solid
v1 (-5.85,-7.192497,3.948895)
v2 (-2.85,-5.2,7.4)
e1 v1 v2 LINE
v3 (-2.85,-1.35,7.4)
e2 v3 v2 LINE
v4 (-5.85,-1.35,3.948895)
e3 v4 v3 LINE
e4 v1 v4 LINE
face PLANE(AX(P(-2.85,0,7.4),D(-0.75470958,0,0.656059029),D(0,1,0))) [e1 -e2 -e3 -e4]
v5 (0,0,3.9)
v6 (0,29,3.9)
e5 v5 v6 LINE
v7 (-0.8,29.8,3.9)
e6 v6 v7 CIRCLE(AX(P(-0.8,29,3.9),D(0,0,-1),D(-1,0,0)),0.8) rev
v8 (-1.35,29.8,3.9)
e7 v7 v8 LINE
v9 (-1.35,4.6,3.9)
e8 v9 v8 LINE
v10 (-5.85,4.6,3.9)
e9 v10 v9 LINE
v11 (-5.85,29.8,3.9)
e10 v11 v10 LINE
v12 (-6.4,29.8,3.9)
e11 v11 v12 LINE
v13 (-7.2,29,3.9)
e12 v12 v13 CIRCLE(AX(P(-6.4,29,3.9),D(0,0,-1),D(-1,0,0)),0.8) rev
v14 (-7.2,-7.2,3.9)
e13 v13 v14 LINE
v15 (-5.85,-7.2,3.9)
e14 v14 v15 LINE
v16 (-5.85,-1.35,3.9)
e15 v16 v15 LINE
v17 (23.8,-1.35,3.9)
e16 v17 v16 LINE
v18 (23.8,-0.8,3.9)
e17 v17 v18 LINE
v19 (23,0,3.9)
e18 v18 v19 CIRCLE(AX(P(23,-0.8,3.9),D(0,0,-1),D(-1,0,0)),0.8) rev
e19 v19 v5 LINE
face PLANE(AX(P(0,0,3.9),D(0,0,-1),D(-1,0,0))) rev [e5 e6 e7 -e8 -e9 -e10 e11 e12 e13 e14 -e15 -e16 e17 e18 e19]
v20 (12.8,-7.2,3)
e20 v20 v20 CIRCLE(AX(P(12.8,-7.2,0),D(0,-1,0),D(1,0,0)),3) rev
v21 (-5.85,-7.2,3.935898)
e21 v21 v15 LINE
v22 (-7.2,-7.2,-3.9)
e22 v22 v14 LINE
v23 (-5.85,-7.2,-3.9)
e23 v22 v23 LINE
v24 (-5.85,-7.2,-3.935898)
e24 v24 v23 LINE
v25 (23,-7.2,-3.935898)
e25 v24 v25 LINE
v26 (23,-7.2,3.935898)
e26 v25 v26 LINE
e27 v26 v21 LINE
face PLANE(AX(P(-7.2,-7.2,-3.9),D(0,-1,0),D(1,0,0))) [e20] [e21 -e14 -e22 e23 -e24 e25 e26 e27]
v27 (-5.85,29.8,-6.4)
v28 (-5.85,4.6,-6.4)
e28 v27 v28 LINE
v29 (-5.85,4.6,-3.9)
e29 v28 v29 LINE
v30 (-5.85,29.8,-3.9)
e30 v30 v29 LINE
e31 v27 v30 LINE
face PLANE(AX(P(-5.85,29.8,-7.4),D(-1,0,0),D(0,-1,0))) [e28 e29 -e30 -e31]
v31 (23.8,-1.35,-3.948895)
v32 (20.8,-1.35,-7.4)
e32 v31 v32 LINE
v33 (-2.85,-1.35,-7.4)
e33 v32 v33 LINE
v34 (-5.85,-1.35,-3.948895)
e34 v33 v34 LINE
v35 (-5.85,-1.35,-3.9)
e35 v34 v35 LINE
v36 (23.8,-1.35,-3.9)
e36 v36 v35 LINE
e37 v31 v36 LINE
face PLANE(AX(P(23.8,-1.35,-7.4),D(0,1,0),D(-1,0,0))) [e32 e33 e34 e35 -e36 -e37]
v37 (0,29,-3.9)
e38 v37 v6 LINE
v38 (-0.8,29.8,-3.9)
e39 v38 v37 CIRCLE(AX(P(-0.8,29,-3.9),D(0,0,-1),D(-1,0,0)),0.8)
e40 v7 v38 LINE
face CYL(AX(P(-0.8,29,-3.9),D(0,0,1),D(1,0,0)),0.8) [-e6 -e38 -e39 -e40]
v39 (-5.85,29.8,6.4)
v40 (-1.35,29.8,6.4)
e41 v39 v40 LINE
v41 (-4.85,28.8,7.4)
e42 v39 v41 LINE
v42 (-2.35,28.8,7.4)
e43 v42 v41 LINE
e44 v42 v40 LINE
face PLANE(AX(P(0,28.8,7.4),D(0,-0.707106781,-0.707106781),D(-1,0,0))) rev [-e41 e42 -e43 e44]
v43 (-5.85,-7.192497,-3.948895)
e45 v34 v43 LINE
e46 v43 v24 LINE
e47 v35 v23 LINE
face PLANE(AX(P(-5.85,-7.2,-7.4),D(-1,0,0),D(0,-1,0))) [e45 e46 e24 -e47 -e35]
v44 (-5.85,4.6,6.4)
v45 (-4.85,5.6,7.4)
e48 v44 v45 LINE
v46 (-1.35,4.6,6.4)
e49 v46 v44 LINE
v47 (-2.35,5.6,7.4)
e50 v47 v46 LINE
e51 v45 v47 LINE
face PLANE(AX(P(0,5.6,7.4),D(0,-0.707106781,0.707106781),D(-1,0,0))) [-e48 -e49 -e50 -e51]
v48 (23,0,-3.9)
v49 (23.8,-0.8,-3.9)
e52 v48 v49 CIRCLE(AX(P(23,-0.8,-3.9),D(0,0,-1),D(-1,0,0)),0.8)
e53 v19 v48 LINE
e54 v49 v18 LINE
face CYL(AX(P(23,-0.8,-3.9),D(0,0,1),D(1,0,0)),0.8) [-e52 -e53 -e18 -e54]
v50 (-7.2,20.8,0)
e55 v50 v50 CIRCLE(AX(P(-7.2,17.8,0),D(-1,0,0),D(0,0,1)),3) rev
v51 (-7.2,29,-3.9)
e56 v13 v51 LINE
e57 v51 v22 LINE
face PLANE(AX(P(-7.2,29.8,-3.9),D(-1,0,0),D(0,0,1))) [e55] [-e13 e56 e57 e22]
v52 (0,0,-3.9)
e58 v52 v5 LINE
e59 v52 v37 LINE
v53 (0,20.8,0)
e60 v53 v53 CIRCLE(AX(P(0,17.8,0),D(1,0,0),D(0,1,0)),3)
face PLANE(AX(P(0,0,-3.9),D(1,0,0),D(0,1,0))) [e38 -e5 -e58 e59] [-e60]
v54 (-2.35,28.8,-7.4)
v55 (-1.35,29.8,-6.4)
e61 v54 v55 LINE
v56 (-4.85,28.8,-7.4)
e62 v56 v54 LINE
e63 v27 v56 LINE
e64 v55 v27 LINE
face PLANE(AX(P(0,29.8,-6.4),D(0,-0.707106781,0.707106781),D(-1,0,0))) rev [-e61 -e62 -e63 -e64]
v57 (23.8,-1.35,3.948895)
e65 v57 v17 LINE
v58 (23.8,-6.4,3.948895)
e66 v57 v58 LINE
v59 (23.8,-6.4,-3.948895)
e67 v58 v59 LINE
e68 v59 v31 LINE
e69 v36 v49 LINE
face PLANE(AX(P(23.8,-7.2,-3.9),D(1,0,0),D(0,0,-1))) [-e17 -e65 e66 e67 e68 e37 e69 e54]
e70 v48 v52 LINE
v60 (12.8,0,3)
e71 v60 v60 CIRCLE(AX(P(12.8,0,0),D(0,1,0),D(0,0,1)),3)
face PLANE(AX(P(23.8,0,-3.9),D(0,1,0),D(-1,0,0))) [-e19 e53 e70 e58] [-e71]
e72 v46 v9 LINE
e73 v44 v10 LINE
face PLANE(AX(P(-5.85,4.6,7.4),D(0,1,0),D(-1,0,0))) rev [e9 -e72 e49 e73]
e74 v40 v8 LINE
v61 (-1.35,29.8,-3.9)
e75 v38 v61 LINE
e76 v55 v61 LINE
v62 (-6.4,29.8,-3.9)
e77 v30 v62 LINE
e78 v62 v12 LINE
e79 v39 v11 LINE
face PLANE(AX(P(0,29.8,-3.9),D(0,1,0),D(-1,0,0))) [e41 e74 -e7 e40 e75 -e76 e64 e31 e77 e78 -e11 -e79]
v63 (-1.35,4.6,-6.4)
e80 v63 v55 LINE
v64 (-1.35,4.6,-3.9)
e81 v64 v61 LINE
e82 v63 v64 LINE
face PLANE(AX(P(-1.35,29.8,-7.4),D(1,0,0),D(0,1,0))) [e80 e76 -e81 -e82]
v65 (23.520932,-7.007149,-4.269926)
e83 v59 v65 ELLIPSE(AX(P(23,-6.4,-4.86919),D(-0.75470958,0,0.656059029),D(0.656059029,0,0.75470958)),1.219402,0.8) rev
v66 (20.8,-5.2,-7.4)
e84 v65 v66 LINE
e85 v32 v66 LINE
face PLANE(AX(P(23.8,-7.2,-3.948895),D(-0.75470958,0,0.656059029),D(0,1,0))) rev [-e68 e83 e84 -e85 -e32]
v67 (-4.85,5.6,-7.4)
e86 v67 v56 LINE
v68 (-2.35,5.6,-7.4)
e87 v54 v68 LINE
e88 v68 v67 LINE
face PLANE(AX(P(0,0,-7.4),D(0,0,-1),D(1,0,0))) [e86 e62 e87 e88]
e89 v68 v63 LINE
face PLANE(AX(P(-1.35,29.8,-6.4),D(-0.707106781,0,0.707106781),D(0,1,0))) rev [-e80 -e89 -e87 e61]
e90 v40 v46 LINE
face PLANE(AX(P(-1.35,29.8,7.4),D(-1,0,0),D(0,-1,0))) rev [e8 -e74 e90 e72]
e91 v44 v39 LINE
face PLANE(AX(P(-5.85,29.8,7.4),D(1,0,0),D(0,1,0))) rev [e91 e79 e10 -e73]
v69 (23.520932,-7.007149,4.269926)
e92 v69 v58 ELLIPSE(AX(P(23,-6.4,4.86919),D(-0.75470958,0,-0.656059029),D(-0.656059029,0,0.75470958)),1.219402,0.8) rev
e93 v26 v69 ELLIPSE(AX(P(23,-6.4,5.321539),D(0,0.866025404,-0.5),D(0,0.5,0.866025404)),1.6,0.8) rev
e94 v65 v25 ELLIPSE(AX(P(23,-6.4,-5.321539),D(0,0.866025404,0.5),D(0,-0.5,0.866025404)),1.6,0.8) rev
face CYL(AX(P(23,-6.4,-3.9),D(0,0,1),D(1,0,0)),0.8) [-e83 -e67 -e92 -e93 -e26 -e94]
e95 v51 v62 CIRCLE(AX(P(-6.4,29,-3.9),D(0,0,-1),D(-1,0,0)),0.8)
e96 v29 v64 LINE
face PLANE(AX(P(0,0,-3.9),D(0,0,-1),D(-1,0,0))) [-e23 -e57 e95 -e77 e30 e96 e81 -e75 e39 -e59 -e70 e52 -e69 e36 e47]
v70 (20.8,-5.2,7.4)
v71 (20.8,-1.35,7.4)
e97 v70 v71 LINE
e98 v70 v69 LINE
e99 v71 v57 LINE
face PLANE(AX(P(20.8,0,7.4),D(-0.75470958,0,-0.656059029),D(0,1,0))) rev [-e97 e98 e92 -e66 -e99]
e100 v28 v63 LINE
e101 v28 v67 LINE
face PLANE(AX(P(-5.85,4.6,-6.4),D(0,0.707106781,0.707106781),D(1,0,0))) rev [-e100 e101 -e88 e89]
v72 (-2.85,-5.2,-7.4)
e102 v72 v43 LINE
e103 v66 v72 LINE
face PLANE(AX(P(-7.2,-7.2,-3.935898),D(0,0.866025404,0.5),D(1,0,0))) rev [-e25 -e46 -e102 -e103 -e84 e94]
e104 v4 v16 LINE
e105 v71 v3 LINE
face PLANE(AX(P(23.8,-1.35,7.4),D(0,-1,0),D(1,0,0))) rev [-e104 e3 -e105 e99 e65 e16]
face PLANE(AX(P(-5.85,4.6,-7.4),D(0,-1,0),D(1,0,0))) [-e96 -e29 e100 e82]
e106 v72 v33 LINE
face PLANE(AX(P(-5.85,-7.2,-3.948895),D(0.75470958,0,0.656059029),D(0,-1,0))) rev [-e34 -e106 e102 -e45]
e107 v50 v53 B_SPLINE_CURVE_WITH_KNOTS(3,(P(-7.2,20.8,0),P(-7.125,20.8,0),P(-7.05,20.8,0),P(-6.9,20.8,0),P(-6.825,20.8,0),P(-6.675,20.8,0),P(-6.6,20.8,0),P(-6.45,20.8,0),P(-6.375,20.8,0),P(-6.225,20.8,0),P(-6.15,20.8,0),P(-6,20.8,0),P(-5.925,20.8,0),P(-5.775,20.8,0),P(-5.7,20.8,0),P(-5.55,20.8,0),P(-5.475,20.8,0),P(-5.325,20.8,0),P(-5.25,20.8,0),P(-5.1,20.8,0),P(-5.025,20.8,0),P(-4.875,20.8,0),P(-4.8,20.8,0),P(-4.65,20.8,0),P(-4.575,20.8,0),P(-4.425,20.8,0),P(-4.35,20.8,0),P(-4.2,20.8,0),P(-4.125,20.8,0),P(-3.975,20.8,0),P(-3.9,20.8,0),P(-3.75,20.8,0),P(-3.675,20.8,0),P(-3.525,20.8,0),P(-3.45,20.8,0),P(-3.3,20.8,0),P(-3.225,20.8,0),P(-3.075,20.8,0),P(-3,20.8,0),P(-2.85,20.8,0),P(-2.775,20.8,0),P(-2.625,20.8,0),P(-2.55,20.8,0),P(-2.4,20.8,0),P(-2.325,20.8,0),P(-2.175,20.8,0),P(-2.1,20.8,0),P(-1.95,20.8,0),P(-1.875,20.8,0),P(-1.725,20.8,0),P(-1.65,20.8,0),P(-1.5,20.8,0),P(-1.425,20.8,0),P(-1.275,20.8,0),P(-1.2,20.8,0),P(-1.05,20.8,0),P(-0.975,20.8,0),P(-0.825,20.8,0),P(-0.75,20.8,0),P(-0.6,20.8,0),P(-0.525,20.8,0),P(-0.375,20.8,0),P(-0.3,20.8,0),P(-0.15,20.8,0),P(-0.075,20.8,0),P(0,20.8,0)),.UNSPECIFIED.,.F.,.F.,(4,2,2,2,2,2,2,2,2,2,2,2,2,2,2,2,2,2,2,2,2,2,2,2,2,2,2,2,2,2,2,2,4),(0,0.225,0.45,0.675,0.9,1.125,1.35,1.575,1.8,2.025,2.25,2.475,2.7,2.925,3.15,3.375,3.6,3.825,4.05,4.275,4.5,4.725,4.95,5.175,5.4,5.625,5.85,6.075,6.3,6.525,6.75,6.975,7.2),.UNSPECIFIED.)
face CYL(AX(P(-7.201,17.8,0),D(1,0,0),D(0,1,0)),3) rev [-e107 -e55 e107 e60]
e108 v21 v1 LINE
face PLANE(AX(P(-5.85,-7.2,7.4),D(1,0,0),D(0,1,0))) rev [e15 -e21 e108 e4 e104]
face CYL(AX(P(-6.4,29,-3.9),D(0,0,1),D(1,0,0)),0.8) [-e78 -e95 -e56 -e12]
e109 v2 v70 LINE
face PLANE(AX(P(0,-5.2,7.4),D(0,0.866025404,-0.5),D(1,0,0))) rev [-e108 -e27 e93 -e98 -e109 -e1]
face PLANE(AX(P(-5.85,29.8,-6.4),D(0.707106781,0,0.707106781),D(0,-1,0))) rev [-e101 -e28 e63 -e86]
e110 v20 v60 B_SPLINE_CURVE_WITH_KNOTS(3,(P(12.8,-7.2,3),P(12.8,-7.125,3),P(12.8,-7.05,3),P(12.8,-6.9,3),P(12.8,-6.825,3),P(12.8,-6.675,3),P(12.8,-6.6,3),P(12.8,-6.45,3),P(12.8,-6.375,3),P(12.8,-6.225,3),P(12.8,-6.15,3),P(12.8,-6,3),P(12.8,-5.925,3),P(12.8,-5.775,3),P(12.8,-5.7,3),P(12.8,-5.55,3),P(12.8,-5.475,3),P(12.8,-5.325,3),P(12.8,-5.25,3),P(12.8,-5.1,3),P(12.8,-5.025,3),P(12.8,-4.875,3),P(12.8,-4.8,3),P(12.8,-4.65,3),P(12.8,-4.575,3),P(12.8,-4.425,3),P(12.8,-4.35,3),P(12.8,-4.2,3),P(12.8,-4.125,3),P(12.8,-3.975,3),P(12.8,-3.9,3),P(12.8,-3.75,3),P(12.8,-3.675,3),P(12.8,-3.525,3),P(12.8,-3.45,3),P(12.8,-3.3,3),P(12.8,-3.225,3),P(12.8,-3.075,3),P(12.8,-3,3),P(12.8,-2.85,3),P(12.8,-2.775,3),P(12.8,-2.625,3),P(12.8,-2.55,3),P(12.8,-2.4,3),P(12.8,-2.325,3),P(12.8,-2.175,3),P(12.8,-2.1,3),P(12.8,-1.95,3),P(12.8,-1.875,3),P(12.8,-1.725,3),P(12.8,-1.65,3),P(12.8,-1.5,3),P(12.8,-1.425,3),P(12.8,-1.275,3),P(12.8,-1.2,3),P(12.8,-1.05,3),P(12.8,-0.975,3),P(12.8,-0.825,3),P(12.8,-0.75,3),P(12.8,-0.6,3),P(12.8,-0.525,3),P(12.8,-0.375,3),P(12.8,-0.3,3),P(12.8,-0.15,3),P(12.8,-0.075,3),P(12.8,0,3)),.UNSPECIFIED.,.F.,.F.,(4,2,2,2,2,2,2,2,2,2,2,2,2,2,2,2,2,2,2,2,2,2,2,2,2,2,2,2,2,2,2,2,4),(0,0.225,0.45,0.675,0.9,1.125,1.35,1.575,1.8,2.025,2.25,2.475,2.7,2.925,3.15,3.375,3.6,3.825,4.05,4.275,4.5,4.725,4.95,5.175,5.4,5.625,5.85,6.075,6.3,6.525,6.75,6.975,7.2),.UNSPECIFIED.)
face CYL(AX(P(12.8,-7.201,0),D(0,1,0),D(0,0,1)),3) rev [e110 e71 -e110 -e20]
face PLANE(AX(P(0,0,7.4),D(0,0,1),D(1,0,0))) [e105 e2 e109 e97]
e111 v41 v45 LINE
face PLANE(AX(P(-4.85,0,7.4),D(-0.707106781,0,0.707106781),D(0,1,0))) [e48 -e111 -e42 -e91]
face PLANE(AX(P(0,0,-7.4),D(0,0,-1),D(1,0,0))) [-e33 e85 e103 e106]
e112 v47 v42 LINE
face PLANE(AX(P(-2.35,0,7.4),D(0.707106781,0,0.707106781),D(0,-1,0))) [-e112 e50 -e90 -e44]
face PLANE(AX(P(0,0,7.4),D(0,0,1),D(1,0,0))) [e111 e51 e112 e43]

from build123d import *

# Parameters (mm, degrees)
EXTRUDE1_DEPTH      = 3.9
EXTRUDE1_DEPTH_BACK = 3.9
SKETCH2_W           = 4.5
SKETCH2_H           = 25.2
SKETCH2_W_2         = 29.65
SKETCH2_H_2         = 5.85
EXTRUDE2_DEPTH      = 3.5
CHAMFER1_SIZE       = 3
CHAMFER1_SIZE2      = 3.451105222
CHAMFER2_SIZE       = 2
CHAMFER2_SIZE2      = 3.464101615
CHAMFER3_SIZE       = 1
EXTRUDE3_REACH      = 40.849
SKETCH4_R           = 3
FILLET1_R           = 0.8
EXTRUDE4_REACH      = 40.849
SKETCH5_R           = 3


# Read off the part's stored shape, not the designer's step: Mirror1
with BuildPart() as part:
    # Sketch1 → Extrude1 (new, two sides: drawn at the far end of the back side and taken through both)
    with BuildSketch(Plane.XY.offset(-EXTRUDE1_DEPTH_BACK)):
        Polygon((0, 0), (0, 29.8), (-7.2, 29.8), (-7.2, -7.2), (23.8, -7.2), (23.8, 0), align=None)
    extrude(amount=EXTRUDE1_DEPTH + EXTRUDE1_DEPTH_BACK)

    # Sketch2 → Extrude2 (add)
    with BuildSketch(Plane.XY.offset(3.9)):
        with Locations((-3.6, 17.2)):
            Rectangle(SKETCH2_W, SKETCH2_H)
        with Locations((8.975, -4.275)):
            Rectangle(SKETCH2_W_2, SKETCH2_H_2)
    extrude(amount=EXTRUDE2_DEPTH)

    # Chamfer1
    chamfer1_edges = [part.edges().sort_by_distance(p)[0] for p in [
        (23.8, -4.275, 7.4),
        (-5.85, -4.275, 7.4),
    ]]
    chamfer1_side = [part.faces().sort_by_distance(p)[0] for p in [
        (8.975, -4.275, 7.4),
    ]]
    chamfer(chamfer1_edges, length=CHAMFER1_SIZE, length2=CHAMFER1_SIZE2, reference=chamfer1_side[0])

    # Chamfer2
    chamfer2_edges = [part.edges().sort_by_distance(p)[0] for p in [
        (8.975, -7.2, 7.4),
    ]]
    chamfer2_side = [part.faces().sort_by_distance(p)[0] for p in [
        (8.975, -4.275, 7.4),
    ]]
    chamfer(chamfer2_edges, length=CHAMFER2_SIZE, length2=CHAMFER2_SIZE2, reference=chamfer2_side[0])

    # Chamfer3
    chamfer3_edges = [part.edges().sort_by_distance(p)[0] for p in [
        (-3.6, 29.8, 7.4),
        (-1.35, 17.2, 7.4),
        (-3.6, 4.6, 7.4),
        (-5.85, 17.2, 7.4),
    ]]
    chamfer(chamfer3_edges, length=CHAMFER3_SIZE)

    # Mirror1: part across plane


with BuildPart() as part_1:
    add(part.part)
    add(part.part.mirror(Plane.XY))

    # Sketch4 → Extrude3 (cut, up to next)
    with BuildSketch(Plane(origin=(0, 0, 0), x_dir=(1, 0, 0), z_dir=(0, 1, 0)), mode=Mode.PRIVATE) as extrude3_sk1:
        with Locations(Location((12.8, 0, 0), (0, 0, 270))):
            Circle(SKETCH4_R)
    extrude3_tool1 = extrude(extrude3_sk1.sketch, amount=-EXTRUDE3_REACH, mode=Mode.PRIVATE) & part_1.part
    add(extrude3_tool1.solids().sort_by_distance((12.8, 0, 0))[0], mode=Mode.SUBTRACT)

    # Fillet1
    fillet1_edges = [part_1.edges().sort_by_distance(p)[0] for p in [
        (-7.2, 29.8, 0),
        (23.8, -7.2, 0),
        (23.8, 0, 0),
        (0, 29.8, 0),
    ]]
    fillet(fillet1_edges, radius=FILLET1_R)

    # Sketch5 → Extrude4 (cut, up to next)
    with BuildSketch(Plane(origin=(0, 0, 0), x_dir=(0, 0, -1), z_dir=(1, 0, 0)), mode=Mode.PRIVATE) as extrude4_sk1:
        with Locations(Location((0, 17.8, 0), (0, 0, 90))):
            Circle(SKETCH5_R)
    extrude4_tool1 = extrude(extrude4_sk1.sketch, amount=-EXTRUDE4_REACH, mode=Mode.PRIVATE) & part_1.part
    add(extrude4_tool1.solids().sort_by_distance((0, 17.8, 0))[0], mode=Mode.SUBTRACT)


solid = part_1.part
